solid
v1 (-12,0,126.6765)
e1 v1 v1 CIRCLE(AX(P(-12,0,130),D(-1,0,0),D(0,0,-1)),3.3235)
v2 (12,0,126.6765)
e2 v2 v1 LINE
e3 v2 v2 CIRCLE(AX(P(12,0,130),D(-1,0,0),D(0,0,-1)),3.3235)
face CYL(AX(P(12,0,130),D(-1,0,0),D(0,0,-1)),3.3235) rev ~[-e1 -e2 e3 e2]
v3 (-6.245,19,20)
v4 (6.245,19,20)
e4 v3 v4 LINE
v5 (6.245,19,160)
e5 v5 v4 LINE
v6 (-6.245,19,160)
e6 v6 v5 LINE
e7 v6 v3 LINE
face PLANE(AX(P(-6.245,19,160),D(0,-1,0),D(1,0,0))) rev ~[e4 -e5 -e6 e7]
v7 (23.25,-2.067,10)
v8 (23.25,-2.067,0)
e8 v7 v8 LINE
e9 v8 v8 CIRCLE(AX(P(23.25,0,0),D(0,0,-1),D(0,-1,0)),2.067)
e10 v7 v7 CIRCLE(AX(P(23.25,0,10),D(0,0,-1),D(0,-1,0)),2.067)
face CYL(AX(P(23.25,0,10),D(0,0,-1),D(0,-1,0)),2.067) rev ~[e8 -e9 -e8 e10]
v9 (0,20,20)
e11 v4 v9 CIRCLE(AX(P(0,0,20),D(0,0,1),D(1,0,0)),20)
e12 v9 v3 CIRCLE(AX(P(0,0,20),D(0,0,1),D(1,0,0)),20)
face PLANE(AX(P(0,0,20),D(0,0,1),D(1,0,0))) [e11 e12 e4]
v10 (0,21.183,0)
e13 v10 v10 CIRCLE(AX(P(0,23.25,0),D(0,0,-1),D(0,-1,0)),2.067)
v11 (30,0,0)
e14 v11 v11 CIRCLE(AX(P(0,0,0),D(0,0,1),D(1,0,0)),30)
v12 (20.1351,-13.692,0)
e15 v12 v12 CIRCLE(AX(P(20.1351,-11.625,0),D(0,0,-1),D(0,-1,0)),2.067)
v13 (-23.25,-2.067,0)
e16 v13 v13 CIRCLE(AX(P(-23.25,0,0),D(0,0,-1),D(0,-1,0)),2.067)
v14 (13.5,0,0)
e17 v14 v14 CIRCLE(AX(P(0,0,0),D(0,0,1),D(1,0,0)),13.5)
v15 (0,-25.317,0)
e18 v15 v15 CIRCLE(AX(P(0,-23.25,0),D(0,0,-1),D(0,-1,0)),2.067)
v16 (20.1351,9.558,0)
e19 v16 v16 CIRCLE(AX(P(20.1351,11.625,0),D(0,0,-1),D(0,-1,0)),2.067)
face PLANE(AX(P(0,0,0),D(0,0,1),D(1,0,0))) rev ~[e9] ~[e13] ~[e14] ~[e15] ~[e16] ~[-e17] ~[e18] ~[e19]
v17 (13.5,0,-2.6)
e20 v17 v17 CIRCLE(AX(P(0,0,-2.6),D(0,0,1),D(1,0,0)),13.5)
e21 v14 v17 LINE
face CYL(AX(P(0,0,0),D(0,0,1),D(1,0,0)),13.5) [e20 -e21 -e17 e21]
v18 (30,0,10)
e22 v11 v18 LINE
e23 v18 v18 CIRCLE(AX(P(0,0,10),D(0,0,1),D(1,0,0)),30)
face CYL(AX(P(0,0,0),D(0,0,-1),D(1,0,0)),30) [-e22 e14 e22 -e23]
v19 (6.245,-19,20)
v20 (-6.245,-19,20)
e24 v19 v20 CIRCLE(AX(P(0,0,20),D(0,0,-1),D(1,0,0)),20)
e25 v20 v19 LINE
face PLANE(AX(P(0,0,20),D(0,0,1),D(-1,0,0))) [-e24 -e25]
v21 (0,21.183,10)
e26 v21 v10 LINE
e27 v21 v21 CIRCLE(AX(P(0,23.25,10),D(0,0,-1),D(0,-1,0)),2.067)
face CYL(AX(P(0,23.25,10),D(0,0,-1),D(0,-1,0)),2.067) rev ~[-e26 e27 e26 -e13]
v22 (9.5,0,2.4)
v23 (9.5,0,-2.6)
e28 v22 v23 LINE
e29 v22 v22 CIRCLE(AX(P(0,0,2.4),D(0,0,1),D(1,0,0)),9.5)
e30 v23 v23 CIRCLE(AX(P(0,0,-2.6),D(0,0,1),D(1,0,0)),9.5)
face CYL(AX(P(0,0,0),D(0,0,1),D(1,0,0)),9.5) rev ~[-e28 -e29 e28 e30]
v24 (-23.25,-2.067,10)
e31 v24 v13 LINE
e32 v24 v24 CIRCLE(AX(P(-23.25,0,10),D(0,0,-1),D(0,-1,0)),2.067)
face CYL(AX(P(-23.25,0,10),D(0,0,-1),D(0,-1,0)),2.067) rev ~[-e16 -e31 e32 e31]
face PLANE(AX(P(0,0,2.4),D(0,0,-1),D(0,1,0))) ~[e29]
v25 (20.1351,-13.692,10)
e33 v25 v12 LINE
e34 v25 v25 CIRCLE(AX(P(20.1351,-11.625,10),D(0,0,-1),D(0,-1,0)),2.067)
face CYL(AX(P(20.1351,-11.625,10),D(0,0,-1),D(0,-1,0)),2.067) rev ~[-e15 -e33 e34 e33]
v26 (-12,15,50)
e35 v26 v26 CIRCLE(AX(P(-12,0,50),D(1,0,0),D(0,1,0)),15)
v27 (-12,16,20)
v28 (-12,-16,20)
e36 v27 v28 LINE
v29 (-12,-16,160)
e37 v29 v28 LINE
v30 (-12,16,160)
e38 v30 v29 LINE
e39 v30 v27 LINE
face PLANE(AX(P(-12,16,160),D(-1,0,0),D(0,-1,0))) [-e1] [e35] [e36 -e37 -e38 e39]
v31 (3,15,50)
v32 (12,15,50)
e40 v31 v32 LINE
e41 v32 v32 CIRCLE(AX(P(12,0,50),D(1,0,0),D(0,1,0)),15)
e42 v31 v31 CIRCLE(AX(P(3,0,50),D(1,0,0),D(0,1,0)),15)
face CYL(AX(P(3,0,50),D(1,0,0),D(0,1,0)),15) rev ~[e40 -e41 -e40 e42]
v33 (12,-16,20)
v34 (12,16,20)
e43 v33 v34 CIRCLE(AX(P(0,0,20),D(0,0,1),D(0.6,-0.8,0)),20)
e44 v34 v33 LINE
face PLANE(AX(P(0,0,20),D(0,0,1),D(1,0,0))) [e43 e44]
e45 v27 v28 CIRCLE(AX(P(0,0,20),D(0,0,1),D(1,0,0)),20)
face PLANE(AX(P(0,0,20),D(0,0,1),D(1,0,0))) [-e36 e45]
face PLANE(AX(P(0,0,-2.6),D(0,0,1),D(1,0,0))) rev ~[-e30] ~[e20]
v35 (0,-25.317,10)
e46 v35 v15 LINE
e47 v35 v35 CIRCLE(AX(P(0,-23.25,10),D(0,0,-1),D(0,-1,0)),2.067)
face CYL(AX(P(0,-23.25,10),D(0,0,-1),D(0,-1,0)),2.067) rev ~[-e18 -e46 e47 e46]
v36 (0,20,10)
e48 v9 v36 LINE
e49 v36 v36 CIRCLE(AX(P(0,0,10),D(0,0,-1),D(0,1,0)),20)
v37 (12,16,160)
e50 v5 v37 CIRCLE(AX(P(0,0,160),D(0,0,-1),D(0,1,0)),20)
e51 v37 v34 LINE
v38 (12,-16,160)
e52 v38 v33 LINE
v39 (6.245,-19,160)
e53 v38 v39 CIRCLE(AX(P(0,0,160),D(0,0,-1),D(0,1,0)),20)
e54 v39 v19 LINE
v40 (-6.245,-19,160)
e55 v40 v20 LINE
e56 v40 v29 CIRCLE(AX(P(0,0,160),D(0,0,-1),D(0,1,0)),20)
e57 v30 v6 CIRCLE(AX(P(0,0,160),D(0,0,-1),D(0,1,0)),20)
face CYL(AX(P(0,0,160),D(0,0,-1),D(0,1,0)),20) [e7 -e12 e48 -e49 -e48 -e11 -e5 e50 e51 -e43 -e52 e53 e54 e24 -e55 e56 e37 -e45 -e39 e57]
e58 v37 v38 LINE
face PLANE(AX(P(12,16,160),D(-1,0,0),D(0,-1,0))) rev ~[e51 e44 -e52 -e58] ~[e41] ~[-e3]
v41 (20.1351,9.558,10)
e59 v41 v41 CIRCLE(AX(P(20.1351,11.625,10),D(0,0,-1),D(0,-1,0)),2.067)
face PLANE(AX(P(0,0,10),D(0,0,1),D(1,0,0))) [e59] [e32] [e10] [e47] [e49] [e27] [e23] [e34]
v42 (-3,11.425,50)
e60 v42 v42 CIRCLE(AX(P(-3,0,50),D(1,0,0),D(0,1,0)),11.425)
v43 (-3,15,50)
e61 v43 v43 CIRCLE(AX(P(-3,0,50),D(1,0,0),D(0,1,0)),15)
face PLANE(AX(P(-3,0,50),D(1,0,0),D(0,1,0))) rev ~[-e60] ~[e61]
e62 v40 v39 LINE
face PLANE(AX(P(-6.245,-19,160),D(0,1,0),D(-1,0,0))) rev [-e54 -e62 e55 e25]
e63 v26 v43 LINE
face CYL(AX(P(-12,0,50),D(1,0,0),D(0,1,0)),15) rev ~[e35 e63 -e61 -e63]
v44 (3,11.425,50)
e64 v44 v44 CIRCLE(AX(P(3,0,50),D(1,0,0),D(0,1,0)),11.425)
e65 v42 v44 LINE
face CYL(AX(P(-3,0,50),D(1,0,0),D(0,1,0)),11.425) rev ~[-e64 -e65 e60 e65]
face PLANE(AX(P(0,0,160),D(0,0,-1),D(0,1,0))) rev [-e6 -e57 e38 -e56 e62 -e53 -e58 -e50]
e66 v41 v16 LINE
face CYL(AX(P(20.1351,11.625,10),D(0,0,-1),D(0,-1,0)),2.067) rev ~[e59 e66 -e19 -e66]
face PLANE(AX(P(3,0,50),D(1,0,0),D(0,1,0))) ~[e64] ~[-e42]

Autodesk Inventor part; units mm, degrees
sketch "Skizze1" plane through (0, 0, 0) normal (0, 0, 1) x (1, 0, 0)
  circle A0 centre (0, 0) radius 30
  circle A1 centre (0, 0) radius 13.5
  circle A2 centre (0, 0) radius 9.5
  circle A3 centre (0, 0) radius 23.25 construction
  line L0 (0, 0) -> (0, 23.25) construction
  point P0 (-23.25, 0)
  point P1 (0, -23.25)
  point P2 (23.25, 0)
  dimension "d4" = 46.5
  dimension "d0" = 4
  dimension "d1" = 27
  dimension "d3" = 30
  dimension "d7" = 360
extrude "Extrusion1" add sketch "Skizze1" along normal blind 10 contours A0 | A1
extrude "Extrusion2" add sketch "Skizze1" against normal blind 2.6 contours A1
sketch "Skizze2" plane through (0, 0, 10) normal (0, 0, 1) x (1, 0, 0)
  point P0 (0, 0)
  point P1 (0, 23.25)
  point P2 (20.1351, 11.625)
  point P3 (20.1351, -11.625)
  point P4 (23.25, 0)
  point P5 (0, -23.25)
  point P6 (-23.25, 0)
hole "Bohrung1" at (0, 23.25, 10) at (20.1351, 11.625, 10) at (20.1351, -11.625, 10) at (23.25, 0, 10) at (0, -23.25, 10) at (-23.25, 0, 10) direction (0, 0, -1) diameter 4.134 end through all thread size "M5x0.8" class "6H" standard "ISO Metric profile"
ref_plane "Arbeitsebene1" through (0, 0, 10) normal (0, 0, 1) x (1, 0, 0)
sketch "Skizze4" plane through (0, 0, 0) normal (1, 0, 0) x (0, 1, 0)
  line L0 (9.5, -2.6) -> (-9.5, -2.6) construction
  line L1 (0, 192.52) -> (0, -35.12) construction
  line L2 (-9.5, 10) -> (-9.5, -2.6) construction
  line L3 (9.5, 10) -> (9.5, -2.6) construction
  line L4 (-9.5, 10) -> (9.5, 10) construction
  line L5 (-9.5, 2.4) -> (9.5, 2.4)
  line L6 (-9.5, 2.4) -> (-9.5, 10)
  line L7 (-9.5, 10) -> (-20, 10)
  line L8 (-20, 10) -> (-20, 160)
  line L9 (-20, 160) -> (20, 160)
  line L10 (20, 10) -> (9.5, 10)
  line L11 (9.5, 10) -> (9.5, 2.4)
  line L12 (20, 160) -> (20, 10)
  line L13 (0, 2.4) -> (0, 160)
  point P0 (0, 0)
  dimension "d27" = 5
  dimension "d31" = 150
  dimension "d33" = 40
revolve "Umdrehung1" add sketch "Skizze4" angle 360 about axis through (0, 0, 0) along (0, 0, -1) contours L13 L9 L12 L10 L11 L5
sketch "Skizze5" plane through (0, 0, 160) normal (0, 0, 1) x (1, 0, 0)
  circle A0 centre (0, 0) radius 20
  line L0 (-12, 16) -> (-12, -16)
  line L1 (12, 16) -> (12, -16)
  line L2 (-6.245, 19) -> (6.245, 19)
  circle A1 centre (0, 0) radius 20 construction
  dimension "MainAxis_Schluesselweite" = 24
  dimension "d46" = 1
  dimension "d52" = 32
extrude "Extrusion3" cut sketch "Skizze5" against normal blind 140 contours A0 L1 | A0 L0
sketch "Skizze6" plane through (0, 0, 0) normal (1, 0, 0) x (0, 1, 0)
  line L0 (-16, 160) -> (16, 160) construction
  line L1 (-16, 20) -> (16, 20) construction
  line L2 (0, -32) -> (0, 192) construction
  line L3 (-16, 20) -> (-16, 160) projected
  line L4 (16, 160) -> (16, 20) projected
  point P0 (0, 0)
  dimension "Flansch_ParralelMech_FlatPart_Width" = 140
ref_plane "Arbeitsebene2" through (0, 0, 90) normal (0, 0, 1) x (1, 0, 0)
ref_plane "Arbeitsebene3" through (0, 0, 50) normal (0, 0, 1) x (1, 0, 0)
ref_plane "Arbeitsebene4" through (0, 0, 130) normal (0, 0, 1) x (1, 0, 0)
extrude "Extrusion4" cut sketch "Skizze5" against normal blind 140 contours L2 A0
sketch "Skizze7" plane through (0, 0, 50) normal (0, 0, 1) x (1, 0, 0)
  line L0 (-12, 16) -> (-12, -16) construction
  line L1 (-12, 15) -> (-3, 15)
  line L2 (-3, 15) -> (-3, 11.425)
  line L3 (-3, 11.425) -> (3, 11.425)
  line L4 (3, 11.425) -> (3, 15)
  line L5 (3, 15) -> (12, 15)
  line L6 (-12, 0) -> (-12, 15)
  line L7 (0, -16) -> (0, 16) construction
  line L8 (12, -16) -> (12, 16) construction
  line L9 (12, 15) -> (12, 0)
  line L10 (-12, 0) -> (12, 0)
  line L11 (-42, 0) -> (42, 0) construction
  point P0 (0, 11.425)
  point P1 (-12, -7.2111)
  point P2 (12, 7.2111)
  dimension "d51" = 9
  dimension "d63" = 30
  dimension "d64" = 22.85
revolve "Umdrehung2" cut sketch "Skizze7" angle 360 about axis through (-10, 0, 50) along (1, 0, 0)
ref_plane "Arbeitsebene5" through (0, 0, 85) normal (1, 0, 0) x (0, 0, -1)
sketch "Skizze8" plane through (12, -16, 160) normal (1, 0, 0) x (0, 0, -1)
  line L0 (30, -26) -> (30, 58) construction
  line L1 (-32.52, 16) -> (195.12, 16) construction
  point P0 (160, 16)
  point P1 (30, 16)
hole "Bohrung2" at (12, 0, 130) direction (-1, 0, 0) diameter 6.647 end through all thread size "M8x1.25" class "6H" standard "ISO Metric profile"
mirror "Spiegeln2" about plane through (0, 0, 0) normal (0, 1, 0) of "Extrusion4"
equation "\"d4\" = Flansch_FemalePart_HoleDia"
equation "\"d1\" = Flansch_Klemmdeckelausnahme_Dia"
equation "\"d3\" = Flansch_FemalePart_OuterDia"
equation "\"d47\" = Flansch_ParralelMech_FlatPart_Width"
equation "\"d33\" = d28"
equation "\"Total_Bearing_Hole_Dist\" = 80"
equation "\"Flansch_FemalePart_HoleDia\" = 46.5"
equation "\"Flansch_Klemmdeckelausnahme_Dia\" = 27"
equation "\"Flansch_FemalePart_OuterDia\" = 30"
equation "\"d28\" = 40"
properties part number "Flansch_FemalePart_MainAxis_HeadConnectorBase" material "Edelstahl"
